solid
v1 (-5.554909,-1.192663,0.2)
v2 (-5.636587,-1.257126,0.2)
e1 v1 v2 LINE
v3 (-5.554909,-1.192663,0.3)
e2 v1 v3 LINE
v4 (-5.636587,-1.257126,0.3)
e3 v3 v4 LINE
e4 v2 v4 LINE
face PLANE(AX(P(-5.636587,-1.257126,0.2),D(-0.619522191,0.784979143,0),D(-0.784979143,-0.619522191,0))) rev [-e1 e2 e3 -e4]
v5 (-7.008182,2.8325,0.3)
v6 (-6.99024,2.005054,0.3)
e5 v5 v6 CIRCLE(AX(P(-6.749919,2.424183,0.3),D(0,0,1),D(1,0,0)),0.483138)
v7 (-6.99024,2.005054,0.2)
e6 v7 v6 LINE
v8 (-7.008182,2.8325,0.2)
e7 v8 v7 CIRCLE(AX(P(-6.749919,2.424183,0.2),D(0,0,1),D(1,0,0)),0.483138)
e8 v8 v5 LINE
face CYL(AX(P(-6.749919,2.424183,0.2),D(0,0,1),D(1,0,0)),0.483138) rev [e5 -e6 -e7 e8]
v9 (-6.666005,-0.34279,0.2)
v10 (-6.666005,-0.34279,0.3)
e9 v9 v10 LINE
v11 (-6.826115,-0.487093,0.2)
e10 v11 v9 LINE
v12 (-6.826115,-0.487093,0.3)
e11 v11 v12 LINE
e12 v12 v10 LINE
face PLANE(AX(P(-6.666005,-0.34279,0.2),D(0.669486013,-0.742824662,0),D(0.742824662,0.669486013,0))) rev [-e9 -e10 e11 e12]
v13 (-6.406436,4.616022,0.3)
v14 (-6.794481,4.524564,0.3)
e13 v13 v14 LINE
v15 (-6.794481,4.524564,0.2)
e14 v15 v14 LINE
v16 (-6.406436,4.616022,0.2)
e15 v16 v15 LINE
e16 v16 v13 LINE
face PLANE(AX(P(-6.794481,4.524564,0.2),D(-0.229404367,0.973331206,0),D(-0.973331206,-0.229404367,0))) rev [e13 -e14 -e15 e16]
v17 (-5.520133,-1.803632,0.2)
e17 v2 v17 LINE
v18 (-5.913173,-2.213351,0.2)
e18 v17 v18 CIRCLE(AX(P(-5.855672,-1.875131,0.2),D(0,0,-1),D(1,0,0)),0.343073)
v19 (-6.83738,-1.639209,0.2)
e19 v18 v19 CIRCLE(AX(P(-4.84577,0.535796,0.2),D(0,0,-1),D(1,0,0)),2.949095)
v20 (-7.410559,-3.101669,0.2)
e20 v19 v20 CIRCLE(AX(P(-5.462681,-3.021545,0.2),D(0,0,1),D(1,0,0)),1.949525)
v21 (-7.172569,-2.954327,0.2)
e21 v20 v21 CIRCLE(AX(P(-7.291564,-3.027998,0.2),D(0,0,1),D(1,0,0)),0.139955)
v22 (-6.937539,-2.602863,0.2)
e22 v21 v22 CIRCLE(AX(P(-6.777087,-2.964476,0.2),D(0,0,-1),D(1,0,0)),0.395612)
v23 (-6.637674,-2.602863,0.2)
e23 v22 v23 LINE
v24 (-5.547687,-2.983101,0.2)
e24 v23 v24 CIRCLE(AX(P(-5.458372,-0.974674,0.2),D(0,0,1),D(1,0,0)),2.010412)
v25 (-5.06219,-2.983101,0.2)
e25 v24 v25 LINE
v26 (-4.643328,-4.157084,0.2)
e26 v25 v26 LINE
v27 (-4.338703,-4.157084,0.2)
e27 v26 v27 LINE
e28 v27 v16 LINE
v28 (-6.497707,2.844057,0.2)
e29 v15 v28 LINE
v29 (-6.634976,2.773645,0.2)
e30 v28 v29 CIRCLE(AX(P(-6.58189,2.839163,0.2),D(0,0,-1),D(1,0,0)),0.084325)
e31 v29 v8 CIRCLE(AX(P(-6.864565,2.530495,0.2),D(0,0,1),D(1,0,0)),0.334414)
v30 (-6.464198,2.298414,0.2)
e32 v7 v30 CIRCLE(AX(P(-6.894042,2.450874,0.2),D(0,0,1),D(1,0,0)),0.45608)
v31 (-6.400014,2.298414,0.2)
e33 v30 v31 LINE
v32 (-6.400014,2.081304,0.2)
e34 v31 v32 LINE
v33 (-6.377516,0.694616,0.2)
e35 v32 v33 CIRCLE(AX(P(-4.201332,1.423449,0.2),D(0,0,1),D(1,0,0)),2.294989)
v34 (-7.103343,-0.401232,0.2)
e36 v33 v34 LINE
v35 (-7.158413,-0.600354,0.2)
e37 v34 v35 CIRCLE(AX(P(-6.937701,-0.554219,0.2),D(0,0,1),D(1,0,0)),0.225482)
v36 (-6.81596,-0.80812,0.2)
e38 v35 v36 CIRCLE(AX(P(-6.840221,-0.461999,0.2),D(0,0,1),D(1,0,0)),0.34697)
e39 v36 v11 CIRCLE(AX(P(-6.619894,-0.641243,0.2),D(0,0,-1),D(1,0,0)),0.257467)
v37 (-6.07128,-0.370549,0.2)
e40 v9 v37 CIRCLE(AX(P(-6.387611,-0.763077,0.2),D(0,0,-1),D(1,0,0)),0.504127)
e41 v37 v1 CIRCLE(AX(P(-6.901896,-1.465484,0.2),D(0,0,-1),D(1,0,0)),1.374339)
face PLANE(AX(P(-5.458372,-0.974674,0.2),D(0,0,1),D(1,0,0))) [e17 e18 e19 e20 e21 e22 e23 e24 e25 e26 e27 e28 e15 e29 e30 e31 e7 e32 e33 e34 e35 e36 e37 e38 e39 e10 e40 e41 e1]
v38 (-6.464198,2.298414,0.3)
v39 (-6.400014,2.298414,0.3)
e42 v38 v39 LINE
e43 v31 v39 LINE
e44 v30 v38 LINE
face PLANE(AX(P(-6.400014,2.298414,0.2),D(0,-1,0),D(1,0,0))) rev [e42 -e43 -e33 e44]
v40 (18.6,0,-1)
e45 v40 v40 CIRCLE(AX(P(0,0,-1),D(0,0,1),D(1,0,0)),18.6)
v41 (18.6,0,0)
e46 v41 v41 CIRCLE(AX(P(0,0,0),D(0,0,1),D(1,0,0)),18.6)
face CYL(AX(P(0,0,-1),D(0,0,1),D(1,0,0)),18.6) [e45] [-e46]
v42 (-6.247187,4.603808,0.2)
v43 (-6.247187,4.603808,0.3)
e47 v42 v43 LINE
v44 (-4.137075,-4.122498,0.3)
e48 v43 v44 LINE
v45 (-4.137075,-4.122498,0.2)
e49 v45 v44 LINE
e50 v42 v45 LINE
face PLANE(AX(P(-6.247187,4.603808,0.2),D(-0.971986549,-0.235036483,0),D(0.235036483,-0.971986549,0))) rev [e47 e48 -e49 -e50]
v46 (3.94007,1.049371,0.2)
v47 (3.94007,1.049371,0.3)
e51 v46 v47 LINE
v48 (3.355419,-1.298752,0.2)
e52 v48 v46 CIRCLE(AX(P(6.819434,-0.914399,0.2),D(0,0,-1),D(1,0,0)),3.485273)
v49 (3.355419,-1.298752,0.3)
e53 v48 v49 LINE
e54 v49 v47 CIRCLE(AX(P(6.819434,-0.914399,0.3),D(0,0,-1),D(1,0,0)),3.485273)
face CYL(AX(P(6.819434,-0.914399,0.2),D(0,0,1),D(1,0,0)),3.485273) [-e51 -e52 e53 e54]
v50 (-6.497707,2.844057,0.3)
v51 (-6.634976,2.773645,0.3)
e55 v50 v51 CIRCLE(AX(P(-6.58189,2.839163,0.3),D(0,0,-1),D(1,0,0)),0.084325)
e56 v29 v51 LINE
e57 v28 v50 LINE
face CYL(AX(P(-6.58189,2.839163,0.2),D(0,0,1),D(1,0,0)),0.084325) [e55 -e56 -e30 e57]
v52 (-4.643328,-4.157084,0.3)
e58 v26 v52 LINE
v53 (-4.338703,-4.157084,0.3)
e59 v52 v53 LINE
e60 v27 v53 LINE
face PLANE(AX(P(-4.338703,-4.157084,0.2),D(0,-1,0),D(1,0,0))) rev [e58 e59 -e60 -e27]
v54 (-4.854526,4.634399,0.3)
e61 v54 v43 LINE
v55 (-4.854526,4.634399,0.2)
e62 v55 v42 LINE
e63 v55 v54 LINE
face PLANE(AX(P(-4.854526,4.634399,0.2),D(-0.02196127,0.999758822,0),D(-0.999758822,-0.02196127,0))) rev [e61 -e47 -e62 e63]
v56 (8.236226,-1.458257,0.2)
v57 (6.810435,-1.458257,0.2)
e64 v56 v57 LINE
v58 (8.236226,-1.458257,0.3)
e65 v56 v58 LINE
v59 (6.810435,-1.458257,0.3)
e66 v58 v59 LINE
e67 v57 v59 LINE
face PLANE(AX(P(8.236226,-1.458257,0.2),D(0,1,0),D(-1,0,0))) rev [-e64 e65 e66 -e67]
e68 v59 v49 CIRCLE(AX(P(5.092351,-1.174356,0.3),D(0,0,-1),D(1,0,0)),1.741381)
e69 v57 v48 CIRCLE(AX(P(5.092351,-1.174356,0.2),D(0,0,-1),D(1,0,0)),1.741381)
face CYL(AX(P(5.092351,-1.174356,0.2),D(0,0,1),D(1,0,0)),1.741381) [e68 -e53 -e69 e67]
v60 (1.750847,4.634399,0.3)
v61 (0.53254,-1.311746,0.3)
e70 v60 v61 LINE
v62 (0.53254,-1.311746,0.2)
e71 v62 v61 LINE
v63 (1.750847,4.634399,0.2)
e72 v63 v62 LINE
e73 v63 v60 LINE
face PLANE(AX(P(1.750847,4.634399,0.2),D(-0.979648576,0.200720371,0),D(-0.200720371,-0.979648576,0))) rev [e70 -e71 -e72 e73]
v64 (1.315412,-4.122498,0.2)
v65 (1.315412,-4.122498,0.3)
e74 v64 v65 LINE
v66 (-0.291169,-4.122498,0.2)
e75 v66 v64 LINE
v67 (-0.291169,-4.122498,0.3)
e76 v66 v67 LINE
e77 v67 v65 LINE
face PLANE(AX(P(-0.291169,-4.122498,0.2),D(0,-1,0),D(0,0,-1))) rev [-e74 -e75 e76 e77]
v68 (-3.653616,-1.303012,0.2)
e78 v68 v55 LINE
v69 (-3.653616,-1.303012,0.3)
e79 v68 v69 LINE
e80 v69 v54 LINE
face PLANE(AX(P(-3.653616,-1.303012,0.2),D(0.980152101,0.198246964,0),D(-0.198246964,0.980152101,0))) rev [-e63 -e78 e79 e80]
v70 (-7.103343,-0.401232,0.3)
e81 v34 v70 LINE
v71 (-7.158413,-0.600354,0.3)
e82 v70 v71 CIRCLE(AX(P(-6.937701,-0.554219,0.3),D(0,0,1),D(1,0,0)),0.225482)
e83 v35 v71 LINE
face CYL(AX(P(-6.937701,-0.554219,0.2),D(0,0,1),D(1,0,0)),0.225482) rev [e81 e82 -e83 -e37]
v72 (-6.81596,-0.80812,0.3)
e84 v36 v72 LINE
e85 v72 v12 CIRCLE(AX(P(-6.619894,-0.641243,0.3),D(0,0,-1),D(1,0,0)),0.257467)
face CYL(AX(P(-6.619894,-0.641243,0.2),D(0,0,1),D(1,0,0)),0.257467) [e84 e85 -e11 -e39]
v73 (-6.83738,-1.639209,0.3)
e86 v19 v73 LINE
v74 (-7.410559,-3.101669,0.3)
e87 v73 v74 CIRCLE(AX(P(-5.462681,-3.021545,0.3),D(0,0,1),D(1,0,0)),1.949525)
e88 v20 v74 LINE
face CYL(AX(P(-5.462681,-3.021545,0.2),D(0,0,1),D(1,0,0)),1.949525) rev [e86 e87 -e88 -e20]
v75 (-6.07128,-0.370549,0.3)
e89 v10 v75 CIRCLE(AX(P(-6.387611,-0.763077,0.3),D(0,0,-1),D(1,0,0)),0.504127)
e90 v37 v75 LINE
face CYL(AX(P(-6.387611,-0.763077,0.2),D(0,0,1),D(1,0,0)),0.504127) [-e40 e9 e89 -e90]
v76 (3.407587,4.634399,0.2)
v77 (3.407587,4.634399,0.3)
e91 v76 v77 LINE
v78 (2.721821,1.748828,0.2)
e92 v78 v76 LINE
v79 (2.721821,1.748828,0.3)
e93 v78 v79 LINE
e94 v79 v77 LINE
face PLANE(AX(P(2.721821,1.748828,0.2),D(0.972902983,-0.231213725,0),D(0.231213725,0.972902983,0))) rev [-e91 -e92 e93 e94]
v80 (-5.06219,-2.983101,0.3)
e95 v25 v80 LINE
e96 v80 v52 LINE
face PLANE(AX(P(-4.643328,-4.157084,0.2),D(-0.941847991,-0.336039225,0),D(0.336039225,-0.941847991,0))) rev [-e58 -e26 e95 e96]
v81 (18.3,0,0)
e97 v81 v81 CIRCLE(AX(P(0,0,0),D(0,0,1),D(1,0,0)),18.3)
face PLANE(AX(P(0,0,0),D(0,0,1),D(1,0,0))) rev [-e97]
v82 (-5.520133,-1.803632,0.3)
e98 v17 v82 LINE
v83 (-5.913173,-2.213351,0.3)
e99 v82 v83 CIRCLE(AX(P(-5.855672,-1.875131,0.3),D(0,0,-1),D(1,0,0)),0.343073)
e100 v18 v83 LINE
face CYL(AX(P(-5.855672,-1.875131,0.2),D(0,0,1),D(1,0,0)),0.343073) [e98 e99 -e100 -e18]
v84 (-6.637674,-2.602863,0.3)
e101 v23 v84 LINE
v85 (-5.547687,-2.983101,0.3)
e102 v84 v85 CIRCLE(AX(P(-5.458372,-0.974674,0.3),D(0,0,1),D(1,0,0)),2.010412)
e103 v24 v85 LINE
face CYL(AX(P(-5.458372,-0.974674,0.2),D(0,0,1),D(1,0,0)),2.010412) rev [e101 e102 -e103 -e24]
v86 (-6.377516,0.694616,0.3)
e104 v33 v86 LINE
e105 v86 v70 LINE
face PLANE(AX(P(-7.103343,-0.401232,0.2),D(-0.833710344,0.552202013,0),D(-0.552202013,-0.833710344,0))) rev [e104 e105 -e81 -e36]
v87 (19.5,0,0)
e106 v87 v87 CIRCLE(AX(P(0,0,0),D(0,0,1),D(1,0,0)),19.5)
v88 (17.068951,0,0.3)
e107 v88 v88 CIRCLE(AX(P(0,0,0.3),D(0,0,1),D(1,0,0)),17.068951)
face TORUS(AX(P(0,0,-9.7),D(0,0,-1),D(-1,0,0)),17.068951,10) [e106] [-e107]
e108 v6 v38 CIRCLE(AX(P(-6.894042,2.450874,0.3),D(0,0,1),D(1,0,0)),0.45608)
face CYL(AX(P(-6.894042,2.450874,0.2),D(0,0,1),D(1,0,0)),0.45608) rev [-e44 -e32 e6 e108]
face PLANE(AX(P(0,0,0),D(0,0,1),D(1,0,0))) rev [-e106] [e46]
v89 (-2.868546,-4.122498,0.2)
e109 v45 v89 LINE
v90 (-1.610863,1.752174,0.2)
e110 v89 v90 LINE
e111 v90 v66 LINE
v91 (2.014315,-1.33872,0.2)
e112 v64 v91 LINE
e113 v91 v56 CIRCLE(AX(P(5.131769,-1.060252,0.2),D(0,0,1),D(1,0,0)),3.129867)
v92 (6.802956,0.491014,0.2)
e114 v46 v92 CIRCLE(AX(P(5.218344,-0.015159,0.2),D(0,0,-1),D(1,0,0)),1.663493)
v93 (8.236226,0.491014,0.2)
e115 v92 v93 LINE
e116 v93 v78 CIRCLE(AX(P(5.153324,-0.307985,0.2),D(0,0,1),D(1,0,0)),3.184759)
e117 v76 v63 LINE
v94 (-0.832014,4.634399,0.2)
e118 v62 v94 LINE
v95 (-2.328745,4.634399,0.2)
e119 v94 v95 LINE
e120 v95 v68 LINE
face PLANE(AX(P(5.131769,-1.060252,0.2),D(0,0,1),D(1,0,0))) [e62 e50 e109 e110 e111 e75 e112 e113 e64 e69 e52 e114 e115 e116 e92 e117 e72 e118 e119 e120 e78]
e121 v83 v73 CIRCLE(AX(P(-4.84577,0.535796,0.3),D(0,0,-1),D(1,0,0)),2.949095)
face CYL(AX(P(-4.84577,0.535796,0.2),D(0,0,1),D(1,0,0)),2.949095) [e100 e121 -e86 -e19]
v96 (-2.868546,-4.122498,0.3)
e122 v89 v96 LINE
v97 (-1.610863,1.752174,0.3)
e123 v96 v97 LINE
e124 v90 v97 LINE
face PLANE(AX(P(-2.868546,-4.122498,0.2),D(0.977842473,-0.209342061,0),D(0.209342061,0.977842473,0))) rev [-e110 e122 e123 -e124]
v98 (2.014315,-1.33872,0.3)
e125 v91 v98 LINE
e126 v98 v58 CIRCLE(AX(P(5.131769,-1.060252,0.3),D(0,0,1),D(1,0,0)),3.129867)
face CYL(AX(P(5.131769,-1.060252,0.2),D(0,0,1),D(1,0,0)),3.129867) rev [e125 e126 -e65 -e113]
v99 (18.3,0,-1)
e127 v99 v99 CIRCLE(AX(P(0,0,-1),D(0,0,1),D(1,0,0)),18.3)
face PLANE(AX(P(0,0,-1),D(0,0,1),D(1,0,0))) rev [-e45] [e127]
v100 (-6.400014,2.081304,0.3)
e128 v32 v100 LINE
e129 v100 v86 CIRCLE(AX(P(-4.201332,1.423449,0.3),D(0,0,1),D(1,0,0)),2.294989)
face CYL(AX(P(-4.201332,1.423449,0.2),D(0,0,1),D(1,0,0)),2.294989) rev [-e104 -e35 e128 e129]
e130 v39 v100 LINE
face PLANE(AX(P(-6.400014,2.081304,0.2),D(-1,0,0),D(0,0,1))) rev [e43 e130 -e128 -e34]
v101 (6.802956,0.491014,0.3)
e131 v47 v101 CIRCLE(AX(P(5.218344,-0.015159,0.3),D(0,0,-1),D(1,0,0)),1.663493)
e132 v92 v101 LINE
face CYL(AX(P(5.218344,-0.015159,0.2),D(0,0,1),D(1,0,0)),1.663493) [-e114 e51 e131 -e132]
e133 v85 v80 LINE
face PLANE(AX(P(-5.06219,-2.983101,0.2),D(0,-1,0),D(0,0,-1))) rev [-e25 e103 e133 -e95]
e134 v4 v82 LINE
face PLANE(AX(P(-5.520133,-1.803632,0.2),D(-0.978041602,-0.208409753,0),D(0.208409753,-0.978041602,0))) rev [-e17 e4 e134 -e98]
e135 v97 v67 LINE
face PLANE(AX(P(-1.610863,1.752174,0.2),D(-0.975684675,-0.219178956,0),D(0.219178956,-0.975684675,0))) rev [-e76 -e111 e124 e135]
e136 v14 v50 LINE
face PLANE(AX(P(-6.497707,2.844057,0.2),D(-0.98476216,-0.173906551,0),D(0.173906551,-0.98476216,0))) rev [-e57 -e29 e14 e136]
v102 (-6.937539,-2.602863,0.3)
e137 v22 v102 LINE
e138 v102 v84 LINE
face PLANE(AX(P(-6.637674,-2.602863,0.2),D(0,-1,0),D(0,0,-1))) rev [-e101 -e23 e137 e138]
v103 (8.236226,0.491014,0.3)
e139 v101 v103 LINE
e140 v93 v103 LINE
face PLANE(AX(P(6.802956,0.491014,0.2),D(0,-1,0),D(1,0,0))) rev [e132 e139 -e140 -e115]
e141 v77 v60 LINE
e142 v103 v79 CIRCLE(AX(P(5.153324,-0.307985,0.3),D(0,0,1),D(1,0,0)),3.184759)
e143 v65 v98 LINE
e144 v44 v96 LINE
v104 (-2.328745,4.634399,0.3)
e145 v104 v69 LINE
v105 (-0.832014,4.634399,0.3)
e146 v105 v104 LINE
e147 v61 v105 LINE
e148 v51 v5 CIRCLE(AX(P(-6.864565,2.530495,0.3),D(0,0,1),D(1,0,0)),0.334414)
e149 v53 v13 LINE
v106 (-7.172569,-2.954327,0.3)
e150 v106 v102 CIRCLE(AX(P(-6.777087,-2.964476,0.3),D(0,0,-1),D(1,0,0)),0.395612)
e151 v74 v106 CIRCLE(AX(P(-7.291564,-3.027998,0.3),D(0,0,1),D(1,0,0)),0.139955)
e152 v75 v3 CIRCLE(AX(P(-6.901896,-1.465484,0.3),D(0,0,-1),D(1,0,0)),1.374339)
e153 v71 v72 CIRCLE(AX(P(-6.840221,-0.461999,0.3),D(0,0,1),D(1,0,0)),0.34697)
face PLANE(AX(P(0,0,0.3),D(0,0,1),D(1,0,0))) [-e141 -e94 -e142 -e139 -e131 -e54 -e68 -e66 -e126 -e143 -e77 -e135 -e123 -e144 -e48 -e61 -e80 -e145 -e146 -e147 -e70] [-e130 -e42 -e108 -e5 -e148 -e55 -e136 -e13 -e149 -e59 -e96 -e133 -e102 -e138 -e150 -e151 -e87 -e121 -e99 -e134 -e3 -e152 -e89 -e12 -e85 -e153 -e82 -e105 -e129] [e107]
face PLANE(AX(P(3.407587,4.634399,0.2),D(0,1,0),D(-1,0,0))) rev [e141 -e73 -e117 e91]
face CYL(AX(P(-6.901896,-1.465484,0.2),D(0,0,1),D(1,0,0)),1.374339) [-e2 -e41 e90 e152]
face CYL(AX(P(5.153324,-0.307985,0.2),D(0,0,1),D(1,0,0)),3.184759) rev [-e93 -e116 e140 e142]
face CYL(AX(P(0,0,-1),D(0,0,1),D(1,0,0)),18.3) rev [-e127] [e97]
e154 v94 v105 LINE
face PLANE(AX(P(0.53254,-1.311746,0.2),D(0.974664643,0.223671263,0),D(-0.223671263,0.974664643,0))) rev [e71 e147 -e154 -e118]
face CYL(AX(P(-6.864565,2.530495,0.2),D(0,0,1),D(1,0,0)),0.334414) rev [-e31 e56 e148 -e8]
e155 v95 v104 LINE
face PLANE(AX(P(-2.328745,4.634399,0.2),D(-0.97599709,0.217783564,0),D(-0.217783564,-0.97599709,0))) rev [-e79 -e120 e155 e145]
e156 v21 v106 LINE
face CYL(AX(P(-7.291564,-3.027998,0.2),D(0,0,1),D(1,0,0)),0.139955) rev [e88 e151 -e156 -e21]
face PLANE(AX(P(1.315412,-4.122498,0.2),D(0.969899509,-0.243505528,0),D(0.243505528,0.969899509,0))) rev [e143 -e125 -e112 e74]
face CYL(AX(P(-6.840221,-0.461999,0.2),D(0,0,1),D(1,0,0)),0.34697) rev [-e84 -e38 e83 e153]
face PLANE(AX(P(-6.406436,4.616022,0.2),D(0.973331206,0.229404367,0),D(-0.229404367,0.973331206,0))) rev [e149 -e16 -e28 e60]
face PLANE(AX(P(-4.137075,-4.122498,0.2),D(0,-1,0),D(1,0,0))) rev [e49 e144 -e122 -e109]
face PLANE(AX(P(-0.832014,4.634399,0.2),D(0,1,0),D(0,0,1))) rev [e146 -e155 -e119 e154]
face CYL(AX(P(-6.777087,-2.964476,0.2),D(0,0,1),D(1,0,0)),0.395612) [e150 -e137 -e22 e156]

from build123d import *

# Parameters (mm, degrees)
SKETCH1_R           = 19.5
BOSS_EXTRUDE1_DEPTH = 0.3
SKETCH1_3_R         = 18.6
SKETCH1_3_R_2       = 18.3
BOSS_EXTRUDE2_DEPTH = 1
FILLET1_R           = 10
CUT_EXTRUDE1_START  = -0.1
CUT_EXTRUDE1_DEPTH  = 0.1


# Read off the part's stored shape, not the designer's step: Cut-Extrude1
with BuildPart() as part:
    # Sketch1 → Boss-Extrude1 (new body)
    with BuildSketch(Plane.XY):
        Circle(SKETCH1_R)
    extrude(amount=BOSS_EXTRUDE1_DEPTH)

    # Sketch1<3> → Boss-Extrude2 (add)
    with BuildSketch(Plane.XY):
        Circle(SKETCH1_3_R)
        Circle(SKETCH1_3_R_2, mode=Mode.SUBTRACT)
    extrude(amount=-BOSS_EXTRUDE2_DEPTH)

    # Fillet1
    # the kernel refuses this fillet: 10 mm, written as the material it takes off along each edge
    with BuildSketch(Plane(origin=(0, 0, 0.3), x_dir=(1, 0, 0), z_dir=(0, -1, 0))) as fillet1_piece_1:
        with BuildLine():
            CenterArc((17.068950844, -10), FILLET1_R, 75.930132252, 14.069867748)
            Line((17.068950844, 0), (17.068950844, 0.2))
            Line((17.068950844, 0.2), (19.5, 0.2))
            Line((19.5, 0.2), (19.7, 0))
            ThreePointArc((19.7, 0), (19.7, -0.15), (19.548620983, -0.106))
            Line((19.548620983, -0.106), (19.5, -0.3))
        make_face()
    revolve(axis=Axis((0, 0, 0.3), (0, 0, 1)), mode=Mode.SUBTRACT)

    # Cut-Extrude1 outline → Cut-Extrude1 (cut)
    with BuildSketch(Plane.XY.offset(0.3).offset(CUT_EXTRUDE1_START)):
        with BuildLine():
            Line((1.315411857, -4.122498151), (2.014314535, -1.338720024))
            ThreePointArc((2.014314535, -1.338720024), (5.071648244, -4.189541516), (8.236226494, -1.458256637))
            Line((8.236226494, -1.458256637), (6.810434555, -1.458256637))
            ThreePointArc((6.810434555, -1.458256637), (5.012044187, -2.913884745), (3.355418791, -1.298752119))
            ThreePointArc((3.355418791, -1.298752119), (3.437417537, -0.072322093), (3.940070016, 1.049370774))
            ThreePointArc((3.940070016, 1.049370774), (5.536779658, 1.617570868), (6.80295626, 0.491014238))
            Line((6.80295626, 0.491014238), (8.236226494, 0.491014238))
            ThreePointArc((8.236226494, 0.491014238), (5.861564417, 2.797023993), (2.721821376, 1.74882811))
            Line((2.721821376, 1.74882811), (3.407587296, 4.634399496))
            Line((3.407587296, 4.634399496), (1.750846599, 4.634399496))
            Line((1.750846599, 4.634399496), (0.532539724, -1.311746329))
            Line((0.532539724, -1.311746329), (-0.832013668, 4.634399496))
            Line((-0.832013668, 4.634399496), (-2.328745068, 4.634399496))
            Line((-2.328745068, 4.634399496), (-3.653616427, -1.303011789))
            Line((-3.653616427, -1.303011789), (-4.854525711, 4.634399496))
            Line((-4.854525711, 4.634399496), (-6.247187009, 4.603807508))
            Line((-6.247187009, 4.603807508), (-4.13707531, -4.122498151))
            Line((-4.13707531, -4.122498151), (-2.868545937, -4.122498151))
            Line((-2.868545937, -4.122498151), (-1.610862761, 1.75217424))
            Line((-1.610862761, 1.75217424), (-0.291169429, -4.122498151))
            Line((-0.291169429, -4.122498151), (1.315411857, -4.122498151))
        make_face()
        with BuildLine():
            Line((-6.937538905, -2.602863273), (-6.637674337, -2.602863273))
            ThreePointArc((-6.637674337, -2.602863273), (-6.120559929, -2.872899906), (-5.547687427, -2.983100592))
            Line((-5.547687427, -2.983100592), (-5.062190332, -2.983100592))
            Line((-5.062190332, -2.983100592), (-4.643328191, -4.157083976))
            Line((-4.643328191, -4.157083976), (-4.338702943, -4.157083976))
            Line((-4.338702943, -4.157083976), (-6.406435712, 4.616022013))
            Line((-6.406435712, 4.616022013), (-6.794480732, 4.524563708))
            Line((-6.794480732, 4.524563708), (-6.497707451, 2.844057166))
            ThreePointArc((-6.497707451, 2.844057166), (-6.543403682, 2.764133189), (-6.634976133, 2.773644958))
            ThreePointArc((-6.634976133, 2.773644958), (-6.812471334, 2.860826812), (-7.00818234, 2.832499724))
            ThreePointArc((-7.00818234, 2.832499724), (-7.232944109, 2.4137084), (-6.990239601, 2.005053843))
            ThreePointArc((-6.990239601, 2.005053843), (-6.671904577, 2.052546685), (-6.464198285, 2.298414239))
            Line((-6.464198285, 2.298414239), (-6.400014039, 2.298414239))
            Line((-6.400014039, 2.298414239), (-6.400014039, 2.081303951))
            ThreePointArc((-6.400014039, 2.081303951), (-6.496019237, 1.38621962), (-6.377516068, 0.694615526))
            Line((-6.377516068, 0.694615526), (-7.103342547, -0.4012317))
            ThreePointArc((-7.103342547, -0.4012317), (-7.155024922, -0.494114517), (-7.158413077, -0.600353898))
            ThreePointArc((-7.158413077, -0.600353898), (-7.020194568, -0.758643223), (-6.815959597, -0.808119916))
            ThreePointArc((-6.815959597, -0.808119916), (-6.877232982, -0.649384136), (-6.826115409, -0.487092826))
            Line((-6.826115409, -0.487092826), (-6.666005475, -0.342790453))
            ThreePointArc((-6.666005475, -0.342790453), (-6.364107135, -0.25949819), (-6.071279663, -0.37054899))
            ThreePointArc((-6.071279663, -0.37054899), (-5.738084346, -0.734492432), (-5.554908519, -1.192663322))
            Line((-5.554908519, -1.192663322), (-5.636587076, -1.257125772))
            Line((-5.636587076, -1.257125772), (-5.52013275, -1.803631749))
            ThreePointArc((-5.52013275, -1.803631749), (-5.60809608, -2.112628848), (-5.913172695, -2.213351306))
            ThreePointArc((-5.913172695, -2.213351306), (-6.401983276, -1.969270784), (-6.837380228, -1.639209304))
            ThreePointArc((-6.837380228, -1.639209304), (-7.277778062, -2.310157247), (-7.410559234, -3.101668811))
            ThreePointArc((-7.410559234, -3.101668811), (-7.217893073, -3.146992956), (-7.172568928, -2.954326795))
            ThreePointArc((-7.172568928, -2.954326795), (-7.105944543, -2.74456355), (-6.937538905, -2.602863273))
        make_face()
    extrude(amount=CUT_EXTRUDE1_DEPTH, mode=Mode.SUBTRACT)


solid = part.part
